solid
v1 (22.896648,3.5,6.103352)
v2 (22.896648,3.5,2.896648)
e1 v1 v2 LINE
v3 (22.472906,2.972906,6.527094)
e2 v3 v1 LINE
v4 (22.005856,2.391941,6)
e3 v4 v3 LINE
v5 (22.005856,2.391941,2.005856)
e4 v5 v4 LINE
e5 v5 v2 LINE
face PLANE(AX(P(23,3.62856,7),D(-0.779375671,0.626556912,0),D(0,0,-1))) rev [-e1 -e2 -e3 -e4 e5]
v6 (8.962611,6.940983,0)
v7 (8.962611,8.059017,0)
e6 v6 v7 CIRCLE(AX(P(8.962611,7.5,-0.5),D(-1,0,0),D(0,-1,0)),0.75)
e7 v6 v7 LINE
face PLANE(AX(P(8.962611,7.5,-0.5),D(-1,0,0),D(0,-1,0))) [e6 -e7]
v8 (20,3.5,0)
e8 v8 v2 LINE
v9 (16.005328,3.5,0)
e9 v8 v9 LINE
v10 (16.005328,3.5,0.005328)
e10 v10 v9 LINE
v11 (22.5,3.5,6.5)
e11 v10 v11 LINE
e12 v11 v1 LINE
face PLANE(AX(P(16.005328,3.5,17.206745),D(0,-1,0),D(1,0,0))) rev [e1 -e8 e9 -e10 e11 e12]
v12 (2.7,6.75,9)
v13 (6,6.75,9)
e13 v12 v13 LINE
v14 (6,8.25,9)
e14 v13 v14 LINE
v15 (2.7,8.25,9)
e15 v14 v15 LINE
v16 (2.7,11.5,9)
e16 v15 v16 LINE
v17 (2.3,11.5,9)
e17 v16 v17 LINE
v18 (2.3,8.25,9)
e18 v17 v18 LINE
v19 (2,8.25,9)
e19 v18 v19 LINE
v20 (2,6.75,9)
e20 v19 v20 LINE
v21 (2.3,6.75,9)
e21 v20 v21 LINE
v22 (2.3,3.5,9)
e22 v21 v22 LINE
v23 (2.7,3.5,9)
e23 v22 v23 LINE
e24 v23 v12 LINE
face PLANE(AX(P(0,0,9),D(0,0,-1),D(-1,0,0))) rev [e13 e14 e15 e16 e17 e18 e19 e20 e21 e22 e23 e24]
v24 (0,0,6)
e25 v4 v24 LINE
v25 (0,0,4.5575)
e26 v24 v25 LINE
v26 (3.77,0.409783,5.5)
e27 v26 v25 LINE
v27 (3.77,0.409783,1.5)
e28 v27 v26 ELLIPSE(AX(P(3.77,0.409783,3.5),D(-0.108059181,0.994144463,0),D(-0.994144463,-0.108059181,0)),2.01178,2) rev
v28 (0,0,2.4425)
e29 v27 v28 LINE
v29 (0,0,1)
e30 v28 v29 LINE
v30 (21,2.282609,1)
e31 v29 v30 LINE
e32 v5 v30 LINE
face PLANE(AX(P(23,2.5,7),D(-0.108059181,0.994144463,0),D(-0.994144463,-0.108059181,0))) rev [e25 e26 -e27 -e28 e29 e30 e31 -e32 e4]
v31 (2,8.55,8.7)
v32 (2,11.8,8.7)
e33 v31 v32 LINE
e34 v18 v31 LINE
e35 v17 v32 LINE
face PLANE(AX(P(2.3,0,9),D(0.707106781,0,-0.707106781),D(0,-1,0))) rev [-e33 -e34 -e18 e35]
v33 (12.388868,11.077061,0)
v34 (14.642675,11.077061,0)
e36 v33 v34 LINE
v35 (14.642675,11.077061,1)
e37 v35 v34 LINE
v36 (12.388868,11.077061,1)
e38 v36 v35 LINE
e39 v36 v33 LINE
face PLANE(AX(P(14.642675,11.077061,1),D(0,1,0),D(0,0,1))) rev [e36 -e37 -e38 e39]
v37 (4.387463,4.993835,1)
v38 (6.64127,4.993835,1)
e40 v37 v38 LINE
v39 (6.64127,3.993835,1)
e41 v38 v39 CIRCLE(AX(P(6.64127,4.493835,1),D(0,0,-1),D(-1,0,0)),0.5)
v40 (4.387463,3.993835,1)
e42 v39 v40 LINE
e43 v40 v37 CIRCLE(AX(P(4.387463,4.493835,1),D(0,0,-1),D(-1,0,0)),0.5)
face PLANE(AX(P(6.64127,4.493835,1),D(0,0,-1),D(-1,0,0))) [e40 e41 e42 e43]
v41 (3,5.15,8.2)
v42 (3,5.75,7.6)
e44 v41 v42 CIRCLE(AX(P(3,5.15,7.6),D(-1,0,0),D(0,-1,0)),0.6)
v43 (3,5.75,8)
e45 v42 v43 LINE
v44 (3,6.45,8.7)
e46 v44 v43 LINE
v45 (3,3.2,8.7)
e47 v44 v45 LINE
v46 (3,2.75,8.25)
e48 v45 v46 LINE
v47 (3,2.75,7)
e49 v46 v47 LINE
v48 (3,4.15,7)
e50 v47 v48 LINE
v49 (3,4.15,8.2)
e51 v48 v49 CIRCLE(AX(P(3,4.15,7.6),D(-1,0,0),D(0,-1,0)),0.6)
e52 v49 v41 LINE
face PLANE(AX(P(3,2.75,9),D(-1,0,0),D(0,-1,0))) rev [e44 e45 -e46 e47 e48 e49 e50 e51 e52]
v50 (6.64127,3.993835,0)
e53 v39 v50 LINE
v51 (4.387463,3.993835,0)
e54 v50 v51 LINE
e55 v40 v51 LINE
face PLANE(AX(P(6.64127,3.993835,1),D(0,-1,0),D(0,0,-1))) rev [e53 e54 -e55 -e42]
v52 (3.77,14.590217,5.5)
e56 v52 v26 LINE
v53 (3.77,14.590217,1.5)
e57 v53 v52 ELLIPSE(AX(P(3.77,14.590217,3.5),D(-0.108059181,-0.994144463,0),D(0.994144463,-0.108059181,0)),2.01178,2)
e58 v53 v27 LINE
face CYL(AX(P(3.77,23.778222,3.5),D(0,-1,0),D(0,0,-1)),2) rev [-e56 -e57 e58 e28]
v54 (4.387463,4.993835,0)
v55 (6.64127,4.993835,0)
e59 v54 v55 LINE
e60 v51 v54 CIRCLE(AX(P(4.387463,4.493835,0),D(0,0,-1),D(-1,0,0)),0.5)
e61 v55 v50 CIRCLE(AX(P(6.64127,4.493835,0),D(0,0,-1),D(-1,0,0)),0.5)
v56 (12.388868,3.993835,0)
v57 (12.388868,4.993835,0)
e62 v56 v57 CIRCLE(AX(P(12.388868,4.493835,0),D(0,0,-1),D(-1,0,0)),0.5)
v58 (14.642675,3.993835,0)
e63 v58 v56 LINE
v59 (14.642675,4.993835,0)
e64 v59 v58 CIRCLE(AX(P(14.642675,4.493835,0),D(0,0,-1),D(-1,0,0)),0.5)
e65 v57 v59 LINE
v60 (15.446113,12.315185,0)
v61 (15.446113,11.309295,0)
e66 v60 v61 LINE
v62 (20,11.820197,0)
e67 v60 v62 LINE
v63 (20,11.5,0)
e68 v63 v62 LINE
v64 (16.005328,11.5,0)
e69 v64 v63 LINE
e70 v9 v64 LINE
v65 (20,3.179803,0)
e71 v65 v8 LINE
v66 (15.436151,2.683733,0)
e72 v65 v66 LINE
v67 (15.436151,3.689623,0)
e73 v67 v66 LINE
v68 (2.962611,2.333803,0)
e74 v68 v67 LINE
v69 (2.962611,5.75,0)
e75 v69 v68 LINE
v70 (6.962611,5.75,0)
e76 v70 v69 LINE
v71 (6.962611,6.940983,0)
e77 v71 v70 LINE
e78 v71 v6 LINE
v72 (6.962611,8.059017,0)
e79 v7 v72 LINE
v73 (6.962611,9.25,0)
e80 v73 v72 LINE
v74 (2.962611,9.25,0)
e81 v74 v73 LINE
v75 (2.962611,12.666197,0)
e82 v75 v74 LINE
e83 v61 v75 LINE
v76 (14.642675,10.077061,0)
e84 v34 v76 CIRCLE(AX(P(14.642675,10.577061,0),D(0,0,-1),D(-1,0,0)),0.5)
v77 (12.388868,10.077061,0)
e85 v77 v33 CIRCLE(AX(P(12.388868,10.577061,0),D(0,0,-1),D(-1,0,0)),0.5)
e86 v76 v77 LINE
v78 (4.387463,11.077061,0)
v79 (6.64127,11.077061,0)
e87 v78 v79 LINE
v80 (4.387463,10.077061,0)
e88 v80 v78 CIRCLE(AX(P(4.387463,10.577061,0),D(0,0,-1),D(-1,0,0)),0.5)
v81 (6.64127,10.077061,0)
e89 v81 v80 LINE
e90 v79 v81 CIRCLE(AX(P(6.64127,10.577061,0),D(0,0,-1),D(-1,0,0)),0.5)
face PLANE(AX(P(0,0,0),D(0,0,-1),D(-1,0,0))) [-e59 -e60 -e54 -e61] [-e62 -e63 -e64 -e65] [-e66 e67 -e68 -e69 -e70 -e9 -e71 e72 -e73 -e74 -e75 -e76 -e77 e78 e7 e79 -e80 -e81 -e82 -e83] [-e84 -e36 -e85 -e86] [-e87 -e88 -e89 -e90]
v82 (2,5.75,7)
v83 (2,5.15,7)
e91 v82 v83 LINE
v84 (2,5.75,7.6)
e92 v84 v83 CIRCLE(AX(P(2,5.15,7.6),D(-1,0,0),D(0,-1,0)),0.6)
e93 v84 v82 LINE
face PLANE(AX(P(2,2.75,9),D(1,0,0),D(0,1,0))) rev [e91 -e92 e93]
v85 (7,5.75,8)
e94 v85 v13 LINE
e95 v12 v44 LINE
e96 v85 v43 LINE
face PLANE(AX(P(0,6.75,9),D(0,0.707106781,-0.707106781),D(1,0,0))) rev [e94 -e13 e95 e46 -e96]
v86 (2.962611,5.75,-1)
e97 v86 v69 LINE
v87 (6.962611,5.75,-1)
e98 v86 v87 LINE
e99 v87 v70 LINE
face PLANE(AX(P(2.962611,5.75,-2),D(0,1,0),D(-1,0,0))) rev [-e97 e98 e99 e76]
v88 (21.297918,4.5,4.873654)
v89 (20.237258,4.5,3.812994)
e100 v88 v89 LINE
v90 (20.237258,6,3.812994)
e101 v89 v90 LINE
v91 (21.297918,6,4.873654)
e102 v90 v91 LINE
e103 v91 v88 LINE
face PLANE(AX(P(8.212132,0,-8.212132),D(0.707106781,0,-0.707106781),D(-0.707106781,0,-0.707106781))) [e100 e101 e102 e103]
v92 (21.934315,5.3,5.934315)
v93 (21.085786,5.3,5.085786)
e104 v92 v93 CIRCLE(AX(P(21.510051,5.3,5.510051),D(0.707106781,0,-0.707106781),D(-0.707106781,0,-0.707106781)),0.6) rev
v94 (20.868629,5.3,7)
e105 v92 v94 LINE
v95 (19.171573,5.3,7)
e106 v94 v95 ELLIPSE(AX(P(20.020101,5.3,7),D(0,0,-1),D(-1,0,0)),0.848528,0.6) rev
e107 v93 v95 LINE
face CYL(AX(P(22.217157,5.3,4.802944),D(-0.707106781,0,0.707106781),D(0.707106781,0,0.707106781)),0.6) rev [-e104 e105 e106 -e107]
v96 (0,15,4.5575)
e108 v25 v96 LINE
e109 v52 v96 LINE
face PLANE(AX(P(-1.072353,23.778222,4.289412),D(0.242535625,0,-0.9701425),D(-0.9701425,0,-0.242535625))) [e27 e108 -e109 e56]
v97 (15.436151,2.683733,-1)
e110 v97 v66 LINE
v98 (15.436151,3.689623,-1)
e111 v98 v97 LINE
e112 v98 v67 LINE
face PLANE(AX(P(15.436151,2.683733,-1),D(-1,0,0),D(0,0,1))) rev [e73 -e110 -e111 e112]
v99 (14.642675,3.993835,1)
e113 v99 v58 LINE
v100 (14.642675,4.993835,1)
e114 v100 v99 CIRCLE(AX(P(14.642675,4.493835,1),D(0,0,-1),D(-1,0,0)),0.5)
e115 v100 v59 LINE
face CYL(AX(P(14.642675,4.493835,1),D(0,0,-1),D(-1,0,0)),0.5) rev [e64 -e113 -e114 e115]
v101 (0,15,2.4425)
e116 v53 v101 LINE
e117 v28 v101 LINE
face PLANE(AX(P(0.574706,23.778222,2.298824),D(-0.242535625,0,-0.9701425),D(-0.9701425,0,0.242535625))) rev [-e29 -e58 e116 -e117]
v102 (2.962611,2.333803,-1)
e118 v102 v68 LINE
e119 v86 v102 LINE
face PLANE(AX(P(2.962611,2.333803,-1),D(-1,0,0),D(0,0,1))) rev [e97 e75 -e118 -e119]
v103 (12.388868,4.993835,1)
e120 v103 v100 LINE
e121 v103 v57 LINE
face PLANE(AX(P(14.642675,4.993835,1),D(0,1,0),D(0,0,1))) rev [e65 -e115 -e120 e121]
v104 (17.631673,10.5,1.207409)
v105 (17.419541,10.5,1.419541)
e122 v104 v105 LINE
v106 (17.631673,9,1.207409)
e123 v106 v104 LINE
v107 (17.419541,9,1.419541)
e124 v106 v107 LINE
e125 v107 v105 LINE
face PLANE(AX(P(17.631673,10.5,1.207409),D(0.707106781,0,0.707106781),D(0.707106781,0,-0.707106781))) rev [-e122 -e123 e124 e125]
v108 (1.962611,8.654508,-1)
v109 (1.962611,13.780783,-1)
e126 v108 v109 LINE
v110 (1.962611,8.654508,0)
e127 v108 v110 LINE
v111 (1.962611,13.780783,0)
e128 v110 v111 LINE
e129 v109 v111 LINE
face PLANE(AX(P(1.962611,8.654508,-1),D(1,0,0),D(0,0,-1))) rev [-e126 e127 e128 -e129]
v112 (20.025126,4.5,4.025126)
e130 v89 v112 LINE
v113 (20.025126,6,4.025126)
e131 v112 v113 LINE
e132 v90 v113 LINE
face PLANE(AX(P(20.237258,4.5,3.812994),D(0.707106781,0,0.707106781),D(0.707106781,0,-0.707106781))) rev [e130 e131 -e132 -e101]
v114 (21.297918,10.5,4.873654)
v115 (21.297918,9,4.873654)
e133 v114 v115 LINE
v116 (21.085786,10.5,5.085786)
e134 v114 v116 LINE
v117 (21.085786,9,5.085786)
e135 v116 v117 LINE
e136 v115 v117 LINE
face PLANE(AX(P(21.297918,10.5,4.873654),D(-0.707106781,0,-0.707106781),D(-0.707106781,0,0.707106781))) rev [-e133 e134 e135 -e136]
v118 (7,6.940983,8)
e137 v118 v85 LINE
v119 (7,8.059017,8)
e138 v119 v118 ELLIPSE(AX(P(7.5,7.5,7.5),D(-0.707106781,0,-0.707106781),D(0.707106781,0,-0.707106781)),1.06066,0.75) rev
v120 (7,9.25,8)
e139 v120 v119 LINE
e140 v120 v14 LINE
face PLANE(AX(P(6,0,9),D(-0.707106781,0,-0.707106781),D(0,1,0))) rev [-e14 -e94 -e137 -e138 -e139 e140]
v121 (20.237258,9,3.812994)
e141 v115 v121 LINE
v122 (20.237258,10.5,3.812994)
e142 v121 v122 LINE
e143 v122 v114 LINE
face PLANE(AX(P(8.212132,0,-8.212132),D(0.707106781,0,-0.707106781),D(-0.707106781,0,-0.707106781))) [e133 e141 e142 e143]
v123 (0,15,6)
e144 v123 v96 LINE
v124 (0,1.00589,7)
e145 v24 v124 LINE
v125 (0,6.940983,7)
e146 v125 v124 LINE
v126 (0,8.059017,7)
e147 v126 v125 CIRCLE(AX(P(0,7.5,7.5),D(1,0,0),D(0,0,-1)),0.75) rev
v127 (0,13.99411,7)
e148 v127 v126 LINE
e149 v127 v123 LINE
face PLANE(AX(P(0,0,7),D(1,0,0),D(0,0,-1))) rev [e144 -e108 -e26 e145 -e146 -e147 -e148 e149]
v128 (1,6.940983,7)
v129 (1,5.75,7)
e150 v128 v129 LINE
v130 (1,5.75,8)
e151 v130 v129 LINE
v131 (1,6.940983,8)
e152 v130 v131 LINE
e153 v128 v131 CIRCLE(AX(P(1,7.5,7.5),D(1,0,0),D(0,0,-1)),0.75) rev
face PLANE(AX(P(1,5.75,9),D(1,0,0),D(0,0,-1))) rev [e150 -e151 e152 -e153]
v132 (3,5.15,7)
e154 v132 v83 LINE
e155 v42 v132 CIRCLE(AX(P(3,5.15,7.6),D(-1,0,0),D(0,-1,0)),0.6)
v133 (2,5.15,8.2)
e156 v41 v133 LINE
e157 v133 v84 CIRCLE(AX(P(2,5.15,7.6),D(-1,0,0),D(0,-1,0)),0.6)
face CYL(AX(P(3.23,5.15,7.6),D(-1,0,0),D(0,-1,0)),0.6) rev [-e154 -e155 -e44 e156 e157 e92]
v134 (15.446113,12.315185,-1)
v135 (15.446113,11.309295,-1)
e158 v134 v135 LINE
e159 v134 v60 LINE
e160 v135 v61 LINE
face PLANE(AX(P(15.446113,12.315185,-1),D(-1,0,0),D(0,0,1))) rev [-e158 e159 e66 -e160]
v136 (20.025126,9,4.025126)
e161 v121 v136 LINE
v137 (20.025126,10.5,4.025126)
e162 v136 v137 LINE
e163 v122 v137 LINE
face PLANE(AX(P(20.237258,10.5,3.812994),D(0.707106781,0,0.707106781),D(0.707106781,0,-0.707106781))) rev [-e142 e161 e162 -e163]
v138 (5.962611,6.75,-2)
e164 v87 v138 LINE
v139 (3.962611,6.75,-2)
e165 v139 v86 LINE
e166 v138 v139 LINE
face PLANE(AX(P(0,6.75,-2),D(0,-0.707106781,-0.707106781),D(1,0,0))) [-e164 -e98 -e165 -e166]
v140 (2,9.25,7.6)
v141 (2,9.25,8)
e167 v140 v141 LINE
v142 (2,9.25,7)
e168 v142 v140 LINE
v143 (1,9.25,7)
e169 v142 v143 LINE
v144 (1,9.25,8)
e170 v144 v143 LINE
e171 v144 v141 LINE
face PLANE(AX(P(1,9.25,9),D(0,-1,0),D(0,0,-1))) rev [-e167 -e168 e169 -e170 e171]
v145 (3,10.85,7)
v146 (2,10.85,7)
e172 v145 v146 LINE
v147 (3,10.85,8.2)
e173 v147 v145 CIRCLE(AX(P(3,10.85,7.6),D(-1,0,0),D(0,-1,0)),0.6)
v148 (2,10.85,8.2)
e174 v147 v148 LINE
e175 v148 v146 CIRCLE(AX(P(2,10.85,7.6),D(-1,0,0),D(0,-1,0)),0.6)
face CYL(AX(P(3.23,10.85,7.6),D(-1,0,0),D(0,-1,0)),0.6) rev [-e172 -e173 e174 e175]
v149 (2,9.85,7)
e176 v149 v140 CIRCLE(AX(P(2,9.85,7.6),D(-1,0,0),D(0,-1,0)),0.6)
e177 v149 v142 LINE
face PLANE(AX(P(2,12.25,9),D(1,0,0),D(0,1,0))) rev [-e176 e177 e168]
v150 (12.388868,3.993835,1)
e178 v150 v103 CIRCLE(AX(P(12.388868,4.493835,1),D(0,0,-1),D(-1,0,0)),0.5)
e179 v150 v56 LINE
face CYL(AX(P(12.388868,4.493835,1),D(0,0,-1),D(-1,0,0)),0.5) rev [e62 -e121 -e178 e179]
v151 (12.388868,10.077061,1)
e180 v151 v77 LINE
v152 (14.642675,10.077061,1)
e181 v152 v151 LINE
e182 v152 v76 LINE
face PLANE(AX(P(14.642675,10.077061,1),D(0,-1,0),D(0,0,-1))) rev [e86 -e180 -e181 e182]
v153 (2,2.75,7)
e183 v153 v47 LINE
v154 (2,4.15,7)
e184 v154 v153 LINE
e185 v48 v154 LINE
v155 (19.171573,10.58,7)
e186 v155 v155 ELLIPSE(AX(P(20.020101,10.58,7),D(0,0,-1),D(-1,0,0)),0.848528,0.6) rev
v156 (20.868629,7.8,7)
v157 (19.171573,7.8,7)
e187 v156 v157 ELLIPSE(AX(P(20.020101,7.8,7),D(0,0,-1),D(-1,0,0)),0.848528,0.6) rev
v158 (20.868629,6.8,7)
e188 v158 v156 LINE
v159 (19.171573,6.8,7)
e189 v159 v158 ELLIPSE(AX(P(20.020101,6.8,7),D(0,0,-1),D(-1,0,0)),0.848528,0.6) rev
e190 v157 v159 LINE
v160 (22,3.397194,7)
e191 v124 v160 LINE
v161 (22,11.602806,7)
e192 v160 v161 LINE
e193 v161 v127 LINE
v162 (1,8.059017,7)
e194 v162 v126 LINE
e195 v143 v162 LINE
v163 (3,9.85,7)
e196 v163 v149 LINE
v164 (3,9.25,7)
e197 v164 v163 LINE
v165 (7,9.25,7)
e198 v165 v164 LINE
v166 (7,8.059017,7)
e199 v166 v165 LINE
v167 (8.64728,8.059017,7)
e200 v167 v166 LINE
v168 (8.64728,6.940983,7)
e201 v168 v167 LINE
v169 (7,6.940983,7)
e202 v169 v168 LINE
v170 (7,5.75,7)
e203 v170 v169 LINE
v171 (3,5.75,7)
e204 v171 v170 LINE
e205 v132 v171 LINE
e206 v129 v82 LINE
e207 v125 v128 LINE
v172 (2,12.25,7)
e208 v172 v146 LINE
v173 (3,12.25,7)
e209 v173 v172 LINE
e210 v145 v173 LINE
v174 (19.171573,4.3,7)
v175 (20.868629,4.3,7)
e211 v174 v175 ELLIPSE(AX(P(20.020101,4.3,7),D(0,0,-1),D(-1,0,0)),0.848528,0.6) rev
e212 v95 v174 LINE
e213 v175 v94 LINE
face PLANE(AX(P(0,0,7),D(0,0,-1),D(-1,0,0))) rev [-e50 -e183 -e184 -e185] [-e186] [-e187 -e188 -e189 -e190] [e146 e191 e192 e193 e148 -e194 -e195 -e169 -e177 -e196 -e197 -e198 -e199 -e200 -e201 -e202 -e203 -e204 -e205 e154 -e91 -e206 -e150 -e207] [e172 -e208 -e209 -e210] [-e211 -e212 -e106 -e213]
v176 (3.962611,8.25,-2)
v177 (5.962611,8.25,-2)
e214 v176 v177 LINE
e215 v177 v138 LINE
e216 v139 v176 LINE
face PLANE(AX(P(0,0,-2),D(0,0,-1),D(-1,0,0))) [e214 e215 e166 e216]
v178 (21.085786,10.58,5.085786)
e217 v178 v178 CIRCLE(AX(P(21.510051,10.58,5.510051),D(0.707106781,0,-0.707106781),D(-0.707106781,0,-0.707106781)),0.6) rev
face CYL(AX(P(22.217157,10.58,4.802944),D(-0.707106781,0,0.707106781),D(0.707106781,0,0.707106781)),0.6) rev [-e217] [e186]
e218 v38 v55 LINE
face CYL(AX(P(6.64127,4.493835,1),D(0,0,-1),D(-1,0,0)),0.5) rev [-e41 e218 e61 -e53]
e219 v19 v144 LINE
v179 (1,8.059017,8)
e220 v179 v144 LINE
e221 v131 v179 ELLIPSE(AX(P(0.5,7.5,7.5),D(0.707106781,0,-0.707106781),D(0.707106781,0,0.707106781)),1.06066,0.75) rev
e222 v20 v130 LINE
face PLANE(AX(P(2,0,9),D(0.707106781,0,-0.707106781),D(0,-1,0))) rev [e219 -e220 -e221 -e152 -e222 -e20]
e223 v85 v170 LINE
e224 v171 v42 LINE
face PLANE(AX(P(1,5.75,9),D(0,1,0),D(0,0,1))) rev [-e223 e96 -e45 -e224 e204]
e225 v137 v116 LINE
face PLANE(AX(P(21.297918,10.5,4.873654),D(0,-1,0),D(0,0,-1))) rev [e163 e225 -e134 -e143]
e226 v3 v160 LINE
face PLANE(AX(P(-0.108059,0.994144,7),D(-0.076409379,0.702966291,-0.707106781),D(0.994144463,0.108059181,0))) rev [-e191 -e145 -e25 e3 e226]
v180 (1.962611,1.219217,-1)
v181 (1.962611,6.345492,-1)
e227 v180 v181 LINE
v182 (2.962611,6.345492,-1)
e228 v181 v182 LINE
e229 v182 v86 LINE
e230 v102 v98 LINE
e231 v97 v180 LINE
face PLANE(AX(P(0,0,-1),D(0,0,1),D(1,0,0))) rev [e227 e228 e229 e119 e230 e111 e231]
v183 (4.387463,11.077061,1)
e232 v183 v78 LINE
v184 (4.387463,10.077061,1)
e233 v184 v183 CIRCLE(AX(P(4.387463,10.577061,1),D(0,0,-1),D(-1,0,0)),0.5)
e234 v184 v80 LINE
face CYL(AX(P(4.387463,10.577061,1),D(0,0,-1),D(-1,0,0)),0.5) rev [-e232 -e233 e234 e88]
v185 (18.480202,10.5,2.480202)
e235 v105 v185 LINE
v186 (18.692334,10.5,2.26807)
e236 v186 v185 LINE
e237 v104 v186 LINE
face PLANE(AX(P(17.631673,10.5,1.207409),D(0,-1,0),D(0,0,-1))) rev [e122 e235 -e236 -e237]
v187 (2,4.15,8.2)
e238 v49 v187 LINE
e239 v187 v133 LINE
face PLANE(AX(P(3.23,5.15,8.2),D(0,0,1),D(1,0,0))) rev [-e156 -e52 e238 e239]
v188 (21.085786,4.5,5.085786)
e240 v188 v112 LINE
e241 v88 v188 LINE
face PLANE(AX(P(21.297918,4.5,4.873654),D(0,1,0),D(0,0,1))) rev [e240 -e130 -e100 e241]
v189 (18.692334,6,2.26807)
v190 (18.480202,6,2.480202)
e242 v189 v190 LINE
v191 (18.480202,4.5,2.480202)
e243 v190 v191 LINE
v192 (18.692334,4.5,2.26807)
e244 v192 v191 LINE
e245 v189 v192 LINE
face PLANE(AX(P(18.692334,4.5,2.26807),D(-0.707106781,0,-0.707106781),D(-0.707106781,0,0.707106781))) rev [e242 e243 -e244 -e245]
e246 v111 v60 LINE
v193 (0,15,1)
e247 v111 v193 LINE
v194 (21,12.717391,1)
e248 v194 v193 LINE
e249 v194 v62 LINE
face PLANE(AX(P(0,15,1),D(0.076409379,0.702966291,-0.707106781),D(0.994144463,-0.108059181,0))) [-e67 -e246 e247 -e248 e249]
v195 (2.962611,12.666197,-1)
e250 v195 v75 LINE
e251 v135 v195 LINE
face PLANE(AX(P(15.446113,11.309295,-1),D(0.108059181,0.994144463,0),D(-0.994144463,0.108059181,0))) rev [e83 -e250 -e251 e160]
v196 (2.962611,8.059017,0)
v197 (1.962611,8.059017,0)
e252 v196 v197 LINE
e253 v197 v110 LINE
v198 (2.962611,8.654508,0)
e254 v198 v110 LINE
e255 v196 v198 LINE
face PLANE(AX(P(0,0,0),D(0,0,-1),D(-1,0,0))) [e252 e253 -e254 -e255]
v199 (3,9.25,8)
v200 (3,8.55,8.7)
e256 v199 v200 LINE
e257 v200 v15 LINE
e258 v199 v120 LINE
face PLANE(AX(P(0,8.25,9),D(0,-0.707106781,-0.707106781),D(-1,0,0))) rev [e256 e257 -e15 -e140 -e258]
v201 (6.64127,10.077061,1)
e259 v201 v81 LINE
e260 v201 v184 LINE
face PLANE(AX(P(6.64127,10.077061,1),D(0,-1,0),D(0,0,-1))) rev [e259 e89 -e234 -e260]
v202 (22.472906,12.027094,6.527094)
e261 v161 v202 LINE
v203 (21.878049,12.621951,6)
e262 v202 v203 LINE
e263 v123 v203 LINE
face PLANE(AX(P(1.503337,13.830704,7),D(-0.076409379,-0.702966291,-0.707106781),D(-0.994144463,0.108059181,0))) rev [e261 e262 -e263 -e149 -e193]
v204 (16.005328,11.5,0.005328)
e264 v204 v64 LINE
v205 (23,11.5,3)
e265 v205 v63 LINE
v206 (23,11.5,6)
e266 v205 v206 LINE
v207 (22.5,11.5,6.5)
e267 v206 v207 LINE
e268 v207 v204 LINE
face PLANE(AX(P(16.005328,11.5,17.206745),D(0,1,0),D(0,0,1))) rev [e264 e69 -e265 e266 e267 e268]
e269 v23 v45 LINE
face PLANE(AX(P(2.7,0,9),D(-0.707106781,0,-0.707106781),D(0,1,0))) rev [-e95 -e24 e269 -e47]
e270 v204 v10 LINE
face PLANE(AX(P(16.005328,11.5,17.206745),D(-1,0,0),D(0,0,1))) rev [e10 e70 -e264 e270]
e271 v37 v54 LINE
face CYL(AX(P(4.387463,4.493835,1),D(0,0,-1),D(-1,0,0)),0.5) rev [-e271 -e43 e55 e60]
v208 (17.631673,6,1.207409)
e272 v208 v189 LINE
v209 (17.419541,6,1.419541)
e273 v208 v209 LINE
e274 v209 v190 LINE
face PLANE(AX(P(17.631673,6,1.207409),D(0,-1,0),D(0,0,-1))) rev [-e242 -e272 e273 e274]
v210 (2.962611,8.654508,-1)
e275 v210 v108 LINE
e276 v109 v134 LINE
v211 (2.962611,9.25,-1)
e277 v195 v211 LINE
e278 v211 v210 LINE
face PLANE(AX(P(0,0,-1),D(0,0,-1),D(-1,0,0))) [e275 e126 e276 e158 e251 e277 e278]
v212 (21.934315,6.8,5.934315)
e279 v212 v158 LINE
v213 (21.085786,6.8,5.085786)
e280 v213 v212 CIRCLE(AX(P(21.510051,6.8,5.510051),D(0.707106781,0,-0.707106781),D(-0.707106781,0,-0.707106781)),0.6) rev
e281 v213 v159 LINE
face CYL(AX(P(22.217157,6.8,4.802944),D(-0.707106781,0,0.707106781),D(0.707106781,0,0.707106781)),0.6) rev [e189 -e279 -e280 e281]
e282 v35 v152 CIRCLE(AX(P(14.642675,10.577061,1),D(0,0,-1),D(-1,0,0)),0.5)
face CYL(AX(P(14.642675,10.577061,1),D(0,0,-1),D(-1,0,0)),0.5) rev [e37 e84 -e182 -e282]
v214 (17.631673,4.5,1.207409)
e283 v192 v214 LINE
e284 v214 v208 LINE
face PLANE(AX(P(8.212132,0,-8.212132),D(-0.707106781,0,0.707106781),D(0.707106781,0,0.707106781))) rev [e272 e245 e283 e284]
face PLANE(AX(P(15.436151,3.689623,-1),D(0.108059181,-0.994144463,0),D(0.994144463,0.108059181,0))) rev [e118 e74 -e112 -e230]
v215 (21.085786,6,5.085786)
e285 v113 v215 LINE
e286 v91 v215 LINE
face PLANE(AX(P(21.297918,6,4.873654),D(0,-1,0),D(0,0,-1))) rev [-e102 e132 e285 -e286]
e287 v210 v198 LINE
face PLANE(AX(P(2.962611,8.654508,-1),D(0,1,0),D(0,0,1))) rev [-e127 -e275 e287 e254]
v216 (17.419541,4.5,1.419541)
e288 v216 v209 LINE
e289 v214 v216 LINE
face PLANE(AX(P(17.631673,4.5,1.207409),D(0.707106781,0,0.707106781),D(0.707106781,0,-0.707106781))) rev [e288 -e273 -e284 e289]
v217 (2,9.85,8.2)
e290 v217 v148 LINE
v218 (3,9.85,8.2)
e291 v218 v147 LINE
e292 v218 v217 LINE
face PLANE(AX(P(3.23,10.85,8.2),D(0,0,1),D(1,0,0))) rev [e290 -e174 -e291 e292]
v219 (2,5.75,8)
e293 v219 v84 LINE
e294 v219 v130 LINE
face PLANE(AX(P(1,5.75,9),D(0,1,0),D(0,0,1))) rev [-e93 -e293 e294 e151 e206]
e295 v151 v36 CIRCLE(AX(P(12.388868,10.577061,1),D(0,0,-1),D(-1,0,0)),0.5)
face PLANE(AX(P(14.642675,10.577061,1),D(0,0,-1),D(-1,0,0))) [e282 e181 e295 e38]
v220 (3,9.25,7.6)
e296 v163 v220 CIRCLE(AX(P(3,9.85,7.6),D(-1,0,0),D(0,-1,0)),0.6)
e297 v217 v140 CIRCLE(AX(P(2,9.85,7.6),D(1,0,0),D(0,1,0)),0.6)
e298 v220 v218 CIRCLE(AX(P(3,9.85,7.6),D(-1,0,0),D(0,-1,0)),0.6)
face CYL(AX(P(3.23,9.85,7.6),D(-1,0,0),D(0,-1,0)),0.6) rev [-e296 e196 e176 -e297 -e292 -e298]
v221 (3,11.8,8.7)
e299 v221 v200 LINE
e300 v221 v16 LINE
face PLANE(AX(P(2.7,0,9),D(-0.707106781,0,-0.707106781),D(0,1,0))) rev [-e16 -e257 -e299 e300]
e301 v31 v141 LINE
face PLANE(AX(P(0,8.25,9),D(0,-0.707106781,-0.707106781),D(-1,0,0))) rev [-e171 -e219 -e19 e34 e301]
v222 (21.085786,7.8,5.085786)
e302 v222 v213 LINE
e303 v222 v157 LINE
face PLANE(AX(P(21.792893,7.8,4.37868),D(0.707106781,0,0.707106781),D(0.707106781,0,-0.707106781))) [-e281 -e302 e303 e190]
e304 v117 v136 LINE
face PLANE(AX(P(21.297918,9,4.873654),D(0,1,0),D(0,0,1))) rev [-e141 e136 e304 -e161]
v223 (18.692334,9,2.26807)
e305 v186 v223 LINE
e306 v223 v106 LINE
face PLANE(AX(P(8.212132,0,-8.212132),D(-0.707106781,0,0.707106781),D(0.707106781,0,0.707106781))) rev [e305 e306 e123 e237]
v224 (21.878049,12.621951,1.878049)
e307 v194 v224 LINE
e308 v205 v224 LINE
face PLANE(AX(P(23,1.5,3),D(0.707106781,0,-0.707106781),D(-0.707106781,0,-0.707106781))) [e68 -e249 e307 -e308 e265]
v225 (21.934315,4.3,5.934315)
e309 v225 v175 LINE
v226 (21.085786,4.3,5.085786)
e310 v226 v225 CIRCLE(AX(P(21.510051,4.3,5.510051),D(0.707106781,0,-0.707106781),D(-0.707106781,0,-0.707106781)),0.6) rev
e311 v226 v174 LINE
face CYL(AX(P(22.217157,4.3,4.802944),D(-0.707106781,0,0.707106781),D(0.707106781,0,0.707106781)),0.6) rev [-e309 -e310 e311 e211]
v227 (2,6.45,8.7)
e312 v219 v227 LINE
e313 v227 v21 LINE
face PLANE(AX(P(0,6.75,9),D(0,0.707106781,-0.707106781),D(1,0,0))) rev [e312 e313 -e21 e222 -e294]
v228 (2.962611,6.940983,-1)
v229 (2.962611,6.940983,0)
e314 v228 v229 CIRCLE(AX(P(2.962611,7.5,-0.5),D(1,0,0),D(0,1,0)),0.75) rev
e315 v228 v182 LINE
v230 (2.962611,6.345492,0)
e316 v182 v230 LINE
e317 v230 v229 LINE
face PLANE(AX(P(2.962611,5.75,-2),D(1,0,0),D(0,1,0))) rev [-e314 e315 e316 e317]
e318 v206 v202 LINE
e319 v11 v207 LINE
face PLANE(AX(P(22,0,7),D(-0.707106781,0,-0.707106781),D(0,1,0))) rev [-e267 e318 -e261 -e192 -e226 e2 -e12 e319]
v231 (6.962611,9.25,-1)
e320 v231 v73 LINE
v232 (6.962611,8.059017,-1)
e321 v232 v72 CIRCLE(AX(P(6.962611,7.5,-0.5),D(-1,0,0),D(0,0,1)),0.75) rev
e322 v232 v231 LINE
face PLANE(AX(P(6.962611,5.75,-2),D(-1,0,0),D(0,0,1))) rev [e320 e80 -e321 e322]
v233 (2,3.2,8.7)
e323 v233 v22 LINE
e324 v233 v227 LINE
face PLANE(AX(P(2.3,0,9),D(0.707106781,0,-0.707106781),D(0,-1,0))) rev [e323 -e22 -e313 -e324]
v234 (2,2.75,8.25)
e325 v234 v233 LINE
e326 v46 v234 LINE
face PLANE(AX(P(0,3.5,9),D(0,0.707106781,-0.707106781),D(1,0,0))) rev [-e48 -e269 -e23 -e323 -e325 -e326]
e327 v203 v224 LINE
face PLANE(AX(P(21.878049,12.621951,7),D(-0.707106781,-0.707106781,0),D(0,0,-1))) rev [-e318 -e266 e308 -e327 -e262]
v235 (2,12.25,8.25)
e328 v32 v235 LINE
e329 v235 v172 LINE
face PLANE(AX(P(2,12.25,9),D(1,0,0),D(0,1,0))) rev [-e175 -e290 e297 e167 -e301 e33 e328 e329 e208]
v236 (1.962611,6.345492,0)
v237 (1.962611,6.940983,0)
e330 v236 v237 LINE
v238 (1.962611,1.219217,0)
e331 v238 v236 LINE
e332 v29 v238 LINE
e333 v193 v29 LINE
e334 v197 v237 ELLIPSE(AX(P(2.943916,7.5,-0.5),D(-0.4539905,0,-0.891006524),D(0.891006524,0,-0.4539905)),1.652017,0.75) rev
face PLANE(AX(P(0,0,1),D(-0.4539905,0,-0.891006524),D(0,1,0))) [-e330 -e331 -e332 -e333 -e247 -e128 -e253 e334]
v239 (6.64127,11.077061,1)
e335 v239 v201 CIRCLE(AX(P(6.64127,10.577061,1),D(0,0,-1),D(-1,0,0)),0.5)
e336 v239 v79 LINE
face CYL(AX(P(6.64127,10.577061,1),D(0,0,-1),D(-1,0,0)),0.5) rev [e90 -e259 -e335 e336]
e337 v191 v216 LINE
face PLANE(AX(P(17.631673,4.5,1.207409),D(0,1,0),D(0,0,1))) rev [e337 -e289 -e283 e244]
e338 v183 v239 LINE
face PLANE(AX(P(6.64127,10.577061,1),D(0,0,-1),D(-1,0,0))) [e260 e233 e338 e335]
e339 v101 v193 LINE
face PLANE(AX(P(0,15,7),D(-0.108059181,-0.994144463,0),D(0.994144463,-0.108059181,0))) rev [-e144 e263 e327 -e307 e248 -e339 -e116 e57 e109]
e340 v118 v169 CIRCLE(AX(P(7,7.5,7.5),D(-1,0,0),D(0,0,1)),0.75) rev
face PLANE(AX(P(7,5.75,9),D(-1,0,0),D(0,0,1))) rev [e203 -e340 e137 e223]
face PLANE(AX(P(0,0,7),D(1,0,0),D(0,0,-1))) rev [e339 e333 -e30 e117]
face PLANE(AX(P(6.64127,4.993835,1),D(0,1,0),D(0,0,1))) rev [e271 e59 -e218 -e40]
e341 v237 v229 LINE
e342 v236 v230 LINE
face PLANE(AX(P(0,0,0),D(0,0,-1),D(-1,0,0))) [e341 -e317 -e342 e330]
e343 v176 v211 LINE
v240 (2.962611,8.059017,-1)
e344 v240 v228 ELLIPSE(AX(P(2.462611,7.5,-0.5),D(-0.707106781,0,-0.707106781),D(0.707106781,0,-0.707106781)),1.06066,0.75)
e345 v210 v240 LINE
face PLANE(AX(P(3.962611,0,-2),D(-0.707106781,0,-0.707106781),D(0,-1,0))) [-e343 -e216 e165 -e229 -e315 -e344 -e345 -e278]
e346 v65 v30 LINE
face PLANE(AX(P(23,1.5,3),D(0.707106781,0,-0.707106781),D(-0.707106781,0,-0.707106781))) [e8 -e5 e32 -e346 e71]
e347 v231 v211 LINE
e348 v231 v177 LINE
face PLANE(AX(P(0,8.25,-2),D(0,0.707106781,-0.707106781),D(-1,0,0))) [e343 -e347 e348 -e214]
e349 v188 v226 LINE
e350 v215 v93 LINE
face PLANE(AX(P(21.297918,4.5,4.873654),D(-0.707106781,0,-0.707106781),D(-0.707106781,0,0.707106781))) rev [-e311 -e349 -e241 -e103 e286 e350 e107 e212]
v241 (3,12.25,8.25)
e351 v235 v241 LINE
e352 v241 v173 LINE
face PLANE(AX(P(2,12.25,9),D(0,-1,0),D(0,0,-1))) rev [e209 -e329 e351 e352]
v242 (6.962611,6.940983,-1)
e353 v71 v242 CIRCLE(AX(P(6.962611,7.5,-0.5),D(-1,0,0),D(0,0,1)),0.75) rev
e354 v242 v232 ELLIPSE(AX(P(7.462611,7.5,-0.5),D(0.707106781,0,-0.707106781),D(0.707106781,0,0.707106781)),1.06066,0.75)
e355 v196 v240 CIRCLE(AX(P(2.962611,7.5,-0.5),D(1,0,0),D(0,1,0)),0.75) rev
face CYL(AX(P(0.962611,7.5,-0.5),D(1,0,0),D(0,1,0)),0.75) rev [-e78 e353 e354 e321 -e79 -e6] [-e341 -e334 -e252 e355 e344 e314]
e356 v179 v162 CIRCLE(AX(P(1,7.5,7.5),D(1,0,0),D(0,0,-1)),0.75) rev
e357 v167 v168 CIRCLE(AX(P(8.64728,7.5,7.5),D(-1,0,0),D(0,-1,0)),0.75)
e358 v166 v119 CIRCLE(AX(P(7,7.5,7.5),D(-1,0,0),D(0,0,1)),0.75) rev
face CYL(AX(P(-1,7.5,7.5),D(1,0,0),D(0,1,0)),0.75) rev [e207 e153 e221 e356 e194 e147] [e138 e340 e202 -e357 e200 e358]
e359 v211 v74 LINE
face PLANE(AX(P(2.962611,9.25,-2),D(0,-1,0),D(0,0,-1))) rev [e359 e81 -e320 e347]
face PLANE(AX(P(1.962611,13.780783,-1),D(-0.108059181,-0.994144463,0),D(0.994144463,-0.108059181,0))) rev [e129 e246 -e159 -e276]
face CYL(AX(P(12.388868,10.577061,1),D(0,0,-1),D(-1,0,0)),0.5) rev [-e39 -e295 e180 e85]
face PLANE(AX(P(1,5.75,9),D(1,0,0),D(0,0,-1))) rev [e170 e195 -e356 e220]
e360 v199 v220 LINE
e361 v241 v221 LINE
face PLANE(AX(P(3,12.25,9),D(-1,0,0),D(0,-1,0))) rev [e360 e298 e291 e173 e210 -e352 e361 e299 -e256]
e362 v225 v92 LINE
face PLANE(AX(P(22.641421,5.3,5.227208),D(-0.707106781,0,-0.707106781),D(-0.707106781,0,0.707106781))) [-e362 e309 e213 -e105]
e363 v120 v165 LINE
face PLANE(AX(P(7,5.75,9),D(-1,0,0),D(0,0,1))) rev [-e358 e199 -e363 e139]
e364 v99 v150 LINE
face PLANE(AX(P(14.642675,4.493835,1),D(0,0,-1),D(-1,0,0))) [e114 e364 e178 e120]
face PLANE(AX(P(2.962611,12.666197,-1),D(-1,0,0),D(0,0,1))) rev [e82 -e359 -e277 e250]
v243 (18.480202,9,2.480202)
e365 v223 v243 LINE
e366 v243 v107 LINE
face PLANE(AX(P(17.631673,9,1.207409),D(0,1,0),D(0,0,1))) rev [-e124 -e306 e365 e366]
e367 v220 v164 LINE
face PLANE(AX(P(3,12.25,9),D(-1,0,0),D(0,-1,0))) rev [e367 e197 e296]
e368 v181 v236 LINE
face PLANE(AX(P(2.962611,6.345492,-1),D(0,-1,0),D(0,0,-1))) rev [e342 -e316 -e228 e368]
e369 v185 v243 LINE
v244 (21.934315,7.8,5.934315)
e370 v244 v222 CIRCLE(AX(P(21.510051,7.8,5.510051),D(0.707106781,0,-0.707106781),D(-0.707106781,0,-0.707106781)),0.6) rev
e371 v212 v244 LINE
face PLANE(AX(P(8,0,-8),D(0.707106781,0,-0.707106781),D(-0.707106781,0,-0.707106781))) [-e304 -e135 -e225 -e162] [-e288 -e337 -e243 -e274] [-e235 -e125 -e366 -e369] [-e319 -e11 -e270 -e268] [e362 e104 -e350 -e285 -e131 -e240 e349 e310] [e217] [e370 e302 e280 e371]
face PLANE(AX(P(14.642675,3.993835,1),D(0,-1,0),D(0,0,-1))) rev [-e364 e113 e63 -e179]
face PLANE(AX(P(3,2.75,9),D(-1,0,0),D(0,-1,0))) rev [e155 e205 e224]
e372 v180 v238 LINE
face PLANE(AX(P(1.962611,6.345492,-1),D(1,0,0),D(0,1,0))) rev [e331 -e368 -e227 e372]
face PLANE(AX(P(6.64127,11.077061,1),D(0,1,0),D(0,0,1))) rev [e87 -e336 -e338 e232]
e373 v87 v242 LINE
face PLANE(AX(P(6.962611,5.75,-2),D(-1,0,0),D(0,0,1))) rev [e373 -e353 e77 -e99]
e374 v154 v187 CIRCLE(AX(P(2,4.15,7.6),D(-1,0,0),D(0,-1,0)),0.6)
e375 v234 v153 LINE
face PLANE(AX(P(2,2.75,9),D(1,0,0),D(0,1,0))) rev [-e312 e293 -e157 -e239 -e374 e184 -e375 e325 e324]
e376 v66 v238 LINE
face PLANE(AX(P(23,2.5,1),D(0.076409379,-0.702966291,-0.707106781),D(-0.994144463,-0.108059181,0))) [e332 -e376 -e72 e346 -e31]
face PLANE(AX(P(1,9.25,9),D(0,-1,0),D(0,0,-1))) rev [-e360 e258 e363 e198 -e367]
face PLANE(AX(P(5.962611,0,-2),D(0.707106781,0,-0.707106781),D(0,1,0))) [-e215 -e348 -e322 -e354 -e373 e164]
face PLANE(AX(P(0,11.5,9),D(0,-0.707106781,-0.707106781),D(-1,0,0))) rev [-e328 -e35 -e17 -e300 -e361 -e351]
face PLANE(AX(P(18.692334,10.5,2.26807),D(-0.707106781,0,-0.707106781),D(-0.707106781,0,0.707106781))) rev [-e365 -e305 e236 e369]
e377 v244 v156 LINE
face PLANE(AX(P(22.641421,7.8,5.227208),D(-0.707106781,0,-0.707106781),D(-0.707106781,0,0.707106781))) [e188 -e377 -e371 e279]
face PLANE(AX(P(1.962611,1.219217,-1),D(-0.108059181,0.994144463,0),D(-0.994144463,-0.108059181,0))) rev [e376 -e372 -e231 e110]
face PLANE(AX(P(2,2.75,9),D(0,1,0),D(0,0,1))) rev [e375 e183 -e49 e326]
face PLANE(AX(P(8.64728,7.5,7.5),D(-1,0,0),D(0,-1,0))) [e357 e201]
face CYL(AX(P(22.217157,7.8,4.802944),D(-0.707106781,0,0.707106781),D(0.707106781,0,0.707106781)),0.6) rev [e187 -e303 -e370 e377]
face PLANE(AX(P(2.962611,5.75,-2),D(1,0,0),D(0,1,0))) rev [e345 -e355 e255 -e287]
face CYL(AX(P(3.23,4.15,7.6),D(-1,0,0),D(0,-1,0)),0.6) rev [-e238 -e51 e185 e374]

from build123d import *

# Parameters (mm, degrees)
BOSS_EXTRUDE1_DEPTH      = 7
CHAMFER1_SIZE            = 1
CHAMFER7_SIZE            = 1
CHAMFER7_EDGE_2_SIZE     = 1
CHAMFER7_EDGE_2_SIZE2    = 1.128559542
CHAMFER7_EDGE_3_SIZE     = 1
CHAMFER7_EDGE_4_SIZE     = 1
CHAMFER7_EDGE_4_SIZE2    = 1.128559542
CHAMFER14_SIZE           = 1
CHAMFER14_SIZE2          = 1.962610506
SKETCH13_W               = 6
SKETCH13_H               = 3.5
BOSS_EXTRUDE4_DEPTH      = 2
CUT_EXTRUDE9_DEPTH       = 2
CUT_EXTRUDE9_DEPTH_BACK  = 7.647280269
SKETCH14_R               = 0.75
CHAMFER15_SIZE           = 1
SKETCH15_W               = 4
SKETCH15_H               = 3.5
BOSS_EXTRUDE6_DEPTH      = 2
CUT_EXTRUDE10_DEPTH      = 2
CUT_EXTRUDE10_DEPTH_BACK = 6
SKETCH18_R               = 0.75
CHAMFER16_SIZE           = 1
CUT_EXTRUDE12_START      = 3.5
CUT_EXTRUDE12_DEPTH      = 8
SKETCH23_W               = 1.5
SKETCH23_H               = 1.5
BOSS_EXTRUDE7_DEPTH      = 0.3
SKETCH30_W               = 1
SKETCH30_H               = 4
BOSS_EXTRUDE12_DEPTH     = 2
CHAMFER19_SIZE           = 0.3
CHAMFER20_SIZE           = 0.75
CUT_EXTRUDE31_DEPTH      = 1
CUT_EXTRUDE31_DEPTH_BACK = 3
SKETCH33_R               = 0.6
CUT_EXTRUDE32_DEPTH      = 1.23
CUT_EXTRUDE33_REACH      = 30.896
CUT_EXTRUDE34_DEPTH      = 10
CUT_EXTRUDE34_DEPTH_BACK = 2
BOSS_EXTRUDE13_DEPTH     = 1
CUT_EXTRUDE35_DEPTH      = 1


# Read off the part's stored shape, not the designer's step: Cut-Extrude12
with BuildPart() as part:
    # Sketch2 → Boss-Extrude1 (new body)
    with BuildSketch(Plane.XY):
        Polygon((0, 0), (0, 15), (23, 12.5), (23, 2.5), align=None)
    extrude(amount=BOSS_EXTRUDE1_DEPTH)

    # Chamfer1
    chamfer1_edges = [part.edges().sort_by_distance(p)[0] for p in [
        (11.5, 13.75, 7),
        (11.5, 1.25, 7),
        (11.5, 13.75, 0),
        (11.5, 1.25, 0),
    ]]
    chamfer(chamfer1_edges, length=CHAMFER1_SIZE)

    # Chamfer7
    chamfer7_edges = [part.edges().sort_by_distance(p)[0] for p in [
        (23, 7.5, 7),
    ]]
    chamfer(chamfer7_edges, length=CHAMFER7_SIZE)

    # Chamfer7 edge 2
    chamfer7_edge_2_edges = [part.edges().sort_by_distance(p)[0] for p in [
        (23, 2.5, 3.5),
    ]]
    chamfer7_edge_2_side = [part.faces().sort_by_distance(p)[0] for p in [
        (11.5, 1.25, 3.5),
    ]]
    chamfer(chamfer7_edge_2_edges, length=CHAMFER7_EDGE_2_SIZE, length2=CHAMFER7_EDGE_2_SIZE2, reference=chamfer7_edge_2_side[0])

    # Chamfer7 edge 3
    chamfer7_edge_3_edges = [part.edges().sort_by_distance(p)[0] for p in [
        (23, 7.5, 0),
    ]]
    chamfer(chamfer7_edge_3_edges, length=CHAMFER7_EDGE_3_SIZE)

    # Chamfer7 edge 4
    chamfer7_edge_4_edges = [part.edges().sort_by_distance(p)[0] for p in [
        (23, 12.5, 3.5),
    ]]
    chamfer7_edge_4_side = [part.faces().sort_by_distance(p)[0] for p in [
        (23, 7.5, 3.5),
    ]]
    chamfer(chamfer7_edge_4_edges, length=CHAMFER7_EDGE_4_SIZE, length2=CHAMFER7_EDGE_4_SIZE2, reference=chamfer7_edge_4_side[0])

    # Chamfer14
    chamfer14_edges = [part.edges().sort_by_distance(p)[0] for p in [
        (0, 7.5, 0),
    ]]
    chamfer14_side = [part.faces().sort_by_distance(p)[0] for p in [
        (0, 7.5, 3.5),
    ]]
    chamfer(chamfer14_edges, length=CHAMFER14_SIZE, length2=CHAMFER14_SIZE2, reference=chamfer14_side[0])

    # Sketch13 → Boss-Extrude4 (add)
    with BuildSketch(Plane.XY.offset(7)):
        with Locations((4, 7.5)):
            Rectangle(SKETCH13_W, SKETCH13_H)
    extrude(amount=BOSS_EXTRUDE4_DEPTH)

    # Sketch14 → Cut-Extrude9 (cut, two sides: drawn at the far end of the back side and taken through both)
    with BuildSketch(Plane.ZY.offset(-1).offset(-CUT_EXTRUDE9_DEPTH_BACK)):
        with Locations(Location((7.5, 7.5, 0), (0, 0, 131.810314896))):
            Circle(SKETCH14_R)
    extrude(amount=CUT_EXTRUDE9_DEPTH + CUT_EXTRUDE9_DEPTH_BACK, mode=Mode.SUBTRACT)

    # Chamfer15
    # the kernel refuses this chamfer: 1 mm, written as the material it takes off along each edge
    with BuildSketch(Plane(origin=(7, 3.178317012, 9), x_dir=(0.027495876610586487, 0, -0.9996219169112968), z_dir=(0, 1, 0)), Plane(origin=(1, 11.821682988, 9), x_dir=(-0.02749587661058638, 0, -0.9996219169112968), z_dir=(0, -1, 0))) as chamfer15_piece_1:
        Polygon((CHAMFER15_SIZE * 0.999621916911, CHAMFER15_SIZE * 0.0274958766106), (-CHAMFER15_SIZE * 0.0274958766106, CHAMFER15_SIZE * 0.999621916911), (0, 0), align=None)
    extrude(amount=8.643365976, mode=Mode.SUBTRACT)
    with BuildSketch(Plane(origin=(9.571682988, 9.25, 9), x_dir=(0, 0.027495876610585623, -0.9996219169112968), z_dir=(-1, 0, 0)), Plane(origin=(-1.571682988, 5.75, 9), x_dir=(0, -0.027495876610586487, -0.9996219169112968), z_dir=(1, 0, 0))) as chamfer15_piece_2:
        Polygon((CHAMFER15_SIZE * 0.999621916911, CHAMFER15_SIZE * 0.0274958766106), (-CHAMFER15_SIZE * 0.0274958766106, CHAMFER15_SIZE * 0.999621916911), (0, 0), align=None)
    extrude(amount=11.143365976, mode=Mode.SUBTRACT)

    # Sketch15 → Boss-Extrude6 (add)
    with BuildSketch(Plane(origin=(0, 0, 0), x_dir=(-1, 0, 0), z_dir=(0, 0, -1))):
        with Locations((-4.962610506, 7.5)):
            Rectangle(SKETCH15_W, SKETCH15_H)
    extrude(amount=BOSS_EXTRUDE6_DEPTH)

    # Sketch18 → Cut-Extrude10 (cut, two sides: drawn at the far end of the back side and taken through both)
    with BuildSketch(Plane.ZY.offset(-2.962610506).offset(-CUT_EXTRUDE10_DEPTH_BACK)):
        with Locations(Location((-0.5, 7.5, 0), (0, 0, 48.189685104))):
            Circle(SKETCH18_R)
    extrude(amount=CUT_EXTRUDE10_DEPTH + CUT_EXTRUDE10_DEPTH_BACK, mode=Mode.SUBTRACT)

    # Chamfer16
    # the kernel refuses this chamfer: 1 mm, written as the material it takes off along each edge
    with BuildSketch(Plane(origin=(6.962610506, 3.178317012, -2), x_dir=(0.027495876610586487, 0, 0.9996219169112968), z_dir=(0, 1, 0)), Plane(origin=(2.962610506, 11.821682988, -2), x_dir=(-0.027495876610586487, 0, 0.9996219169112968), z_dir=(0, -1, 0))) as chamfer16_piece_1:
        Polygon((CHAMFER16_SIZE * 0.999621916911, -CHAMFER16_SIZE * 0.0274958766106), (-CHAMFER16_SIZE * 0.0274958766106, -CHAMFER16_SIZE * 0.999621916911), (0, 0), align=None)
    extrude(amount=8.643365976, mode=Mode.SUBTRACT)
    with BuildSketch(Plane(origin=(0.390927518, 5.75, -2), x_dir=(0, -0.027495876610586487, 0.9996219169112968), z_dir=(1, 0, 0)), Plane(origin=(9.534293493, 9.25, -2), x_dir=(0, 0.027495876610585623, 0.9996219169112968), z_dir=(-1, 0, 0))) as chamfer16_piece_2:
        Polygon((CHAMFER16_SIZE * 0.999621916911, -CHAMFER16_SIZE * 0.0274958766106), (-CHAMFER16_SIZE * 0.0274958766106, -CHAMFER16_SIZE * 0.999621916911), (0, 0), align=None)
    extrude(amount=9.143365976, mode=Mode.SUBTRACT)

    # Cut-Extrude12 outline → Cut-Extrude12 (cut)
    with BuildSketch(Plane(origin=(0, 0, 0), x_dir=(1, 0, 0), z_dir=(0, 1, 0)).offset(CUT_EXTRUDE12_START)):
        Polygon((22, 0), (16.005327865, 0), (16.005327865, -0.005327865), (22.5, -6.5), (23, -6), (23, -1), align=None)
    extrude(amount=CUT_EXTRUDE12_DEPTH, mode=Mode.SUBTRACT)

    # Sketch23 → Boss-Extrude7 (add)
    with BuildSketch(Plane(origin=(8, 0, -8), x_dir=(-0.7071067811865476, 0, -0.7071067811865476), z_dir=(0.7071067811865476, 0, -0.7071067811865476))):
        with Locations((-14.071243238, 5.25)):
            Rectangle(SKETCH23_W, SKETCH23_H)
        with Locations((-14.071243238, 9.75)):
            Rectangle(SKETCH23_W, SKETCH23_H)
        with Locations((-17.756096654, 5.25)):
            Rectangle(SKETCH23_W, SKETCH23_H)
        with Locations((-17.756096654, 9.75)):
            Rectangle(SKETCH23_W, SKETCH23_H)
    extrude(amount=BOSS_EXTRUDE7_DEPTH)

    # Sketch30 → Boss-Extrude12 (add)
    with BuildSketch(Plane.XY.offset(7)):
        with Locations((2.5, 10.25)):
            Rectangle(SKETCH30_W, SKETCH30_H)
        with Locations((2.5, 4.75)):
            Rectangle(SKETCH30_W, SKETCH30_H)
    extrude(amount=BOSS_EXTRUDE12_DEPTH)

    # Chamfer19
    # the kernel refuses this chamfer: 0.3 mm, written as the material it takes off along each edge
    with BuildSketch(Plane(origin=(2, 8.25, 9), x_dir=(-0.027495876610586622, 0, -0.9996219169112968), z_dir=(0, 1, 0))) as chamfer19_piece_1_section:
        Polygon((CHAMFER19_SIZE * 0.999621916911, -CHAMFER19_SIZE * 0.0274958766106), (-CHAMFER19_SIZE * 0.0274958766106, -CHAMFER19_SIZE * 0.999621916911), (0, 0), align=None)
    chamfer19_piece_1 = extrude(amount=4.771504896, mode=Mode.PRIVATE)
    chamfer19_piece_1 = split(chamfer19_piece_1, bisect_by=Plane(origin=(2.100641026, 9.324038462, 7.925961538), z_dir=(0, 0.7071067811862649, 0.7071067811868302)), keep=Keep.TOP, mode=Mode.PRIVATE)
    add(chamfer19_piece_1, mode=Mode.SUBTRACT)
    with BuildSketch(Plane(origin=(3, 13.021504896, 9), x_dir=(0.027495876610585904, 0, -0.9996219169112968), z_dir=(0, -1, 0))) as chamfer19_piece_2_section:
        Polygon((CHAMFER19_SIZE * 0.999621916911, -CHAMFER19_SIZE * 0.0274958766106), (-CHAMFER19_SIZE * 0.0274958766106, -CHAMFER19_SIZE * 0.999621916911), (0, 0), align=None)
    chamfer19_piece_2 = extrude(amount=5.543009793, mode=Mode.PRIVATE)
    chamfer19_piece_2 = split(chamfer19_piece_2, bisect_by=Plane(origin=(2.899358974, 9.324038462, 7.925961538), z_dir=(0, 0.7071067811862649, 0.7071067811868302)), keep=Keep.TOP, mode=Mode.PRIVATE)
    add(chamfer19_piece_2, mode=Mode.SUBTRACT)
    with BuildSketch(Plane(origin=(2, 1.978495104, 9), x_dir=(-0.027495876610586622, 0, -0.9996219169112968), z_dir=(0, 1, 0))) as chamfer19_piece_3_section:
        Polygon((CHAMFER19_SIZE * 0.999621916911, -CHAMFER19_SIZE * 0.0274958766106), (-CHAMFER19_SIZE * 0.0274958766106, -CHAMFER19_SIZE * 0.999621916911), (0, 0), align=None)
    chamfer19_piece_3 = extrude(amount=4.771504896, mode=Mode.PRIVATE)
    chamfer19_piece_3 = split(chamfer19_piece_3, bisect_by=Plane(origin=(2.100641026, 5.675961538, 7.925961538), z_dir=(0, -0.7071067811862649, 0.7071067811868302)), keep=Keep.TOP, mode=Mode.PRIVATE)
    add(chamfer19_piece_3, mode=Mode.SUBTRACT)
    with BuildSketch(Plane(origin=(3, 7.521504896, 9), x_dir=(0.027495876610585904, 0, -0.9996219169112968), z_dir=(0, -1, 0))) as chamfer19_piece_4_section:
        Polygon((CHAMFER19_SIZE * 0.999621916911, -CHAMFER19_SIZE * 0.0274958766106), (-CHAMFER19_SIZE * 0.0274958766106, -CHAMFER19_SIZE * 0.999621916911), (0, 0), align=None)
    chamfer19_piece_4 = extrude(amount=5.543009793, mode=Mode.PRIVATE)
    chamfer19_piece_4 = split(chamfer19_piece_4, bisect_by=Plane(origin=(2.899358974, 5.675961538, 7.925961538), z_dir=(0, -0.7071067811862649, 0.7071067811868302)), keep=Keep.TOP, mode=Mode.PRIVATE)
    add(chamfer19_piece_4, mode=Mode.SUBTRACT)

    # Chamfer20
    chamfer20_edges = [part.edges().sort_by_distance(p)[0] for p in [
        (2.5, 2.75, 9),
        (2.5, 12.25, 9),
    ]]
    chamfer(chamfer20_edges, length=CHAMFER20_SIZE)

    # Sketch33 → Cut-Extrude31 (cut, two sides: drawn at the far end of the back side and taken through both)
    with BuildSketch(Plane(origin=(8, 0, -8), x_dir=(-0.7071067811865476, 0, -0.7071067811865476), z_dir=(0.7071067811865476, 0, -0.7071067811865476)).offset(-CUT_EXTRUDE31_DEPTH_BACK)):
        with Locations((-19.106096654, 10.58)):
            Circle(SKETCH33_R)
        with BuildLine():
            Line((-18.506096654, 7.8), (-18.506096654, 6.8))
            ThreePointArc((-18.506096654, 6.8), (-19.106096654, 6.2), (-19.706096654, 6.8))
            Line((-19.706096654, 6.8), (-19.706096654, 7.8))
            ThreePointArc((-19.706096654, 7.8), (-19.106096654, 8.4), (-18.506096654, 7.8))
        make_face()
        with BuildLine():
            Line((-18.506096654, 5.3), (-18.506096654, 4.3))
            ThreePointArc((-18.506096654, 4.3), (-19.106096654, 3.7), (-19.706096654, 4.3))
            Line((-19.706096654, 4.3), (-19.706096654, 5.3))
            ThreePointArc((-19.706096654, 5.3), (-19.106096654, 5.9), (-18.506096654, 5.3))
        make_face()
    extrude(amount=CUT_EXTRUDE31_DEPTH + CUT_EXTRUDE31_DEPTH_BACK, mode=Mode.SUBTRACT)

    # Sketch35 → Cut-Extrude32 (cut)
    with BuildSketch(Plane.ZY.offset(-2)):
        with BuildLine():
            Line((8.2, 10.85), (8.2, 9.85))
            ThreePointArc((8.2, 9.85), (7.6, 9.25), (7, 9.85))
            Line((7, 9.85), (7, 10.85))
            ThreePointArc((7, 10.85), (7.6, 11.45), (8.2, 10.85))
        make_face()
        with BuildLine():
            Line((8.2, 5.15), (8.2, 4.15))
            ThreePointArc((8.2, 4.15), (7.6, 3.55), (7, 4.15))
            Line((7, 4.15), (7, 5.15))
            ThreePointArc((7, 5.15), (7.6, 5.75), (8.2, 5.15))
        make_face()
    extrude(amount=-CUT_EXTRUDE32_DEPTH, mode=Mode.SUBTRACT)

    # Cut-Extrude33: up to this plane
    cut_extrude33_end = Plane(origin=(0, 15, 7), z_dir=(-0.10805918076841893, -0.9941444630694567, 0))
    # Sketch36 → Cut-Extrude33 (cut, up to the surface)
    with BuildSketch(Plane(origin=(0, 0, 0), x_dir=(0, 0, -1), z_dir=(0, 1, 0)), mode=Mode.PRIVATE) as cut_extrude33_sk1:
        with BuildLine():
            Line((-1.735294118, -2.828823529), (-3, 2.23))
            Line((-3, 2.23), (-4, 2.23))
            Line((-4, 2.23), (-5.264705882, -2.828823529))
            ThreePointArc((-5.264705882, -2.828823529), (-3.5, -1.77), (-1.735294118, -2.828823529))
        make_face()
    cut_extrude33_tool1 = split(extrude(cut_extrude33_sk1.sketch, amount=CUT_EXTRUDE33_REACH, mode=Mode.PRIVATE), bisect_by=cut_extrude33_end, keep=Keep.BOTH, mode=Mode.PRIVATE)
    add(cut_extrude33_tool1.solids().sort_by_distance((0.278692, 0, 3.5))[0], mode=Mode.SUBTRACT)
    # Sketch36 → Cut-Extrude33 (cut, up to the surface)
    with BuildSketch(Plane(origin=(0, 0, 0), x_dir=(0, 0, -1), z_dir=(0, 1, 0)), mode=Mode.PRIVATE) as cut_extrude33_sk2:
        with BuildLine():
            Line((-1.5, -3.77), (-1.735294118, -2.828823529))
            ThreePointArc((-1.735294118, -2.828823529), (-3.5, -1.77), (-5.264705882, -2.828823529))
            Line((-5.264705882, -2.828823529), (-5.5, -3.77))
            ThreePointArc((-5.5, -3.77), (-3.5, -5.77), (-1.5, -3.77))
        make_face()
    cut_extrude33_tool2 = split(extrude(cut_extrude33_sk2.sketch, amount=CUT_EXTRUDE33_REACH, mode=Mode.PRIVATE), bisect_by=cut_extrude33_end, keep=Keep.BOTH, mode=Mode.PRIVATE)
    add(cut_extrude33_tool2.solids().sort_by_distance((3.772955, 0, 3.5))[0], mode=Mode.SUBTRACT)

    # Sketch37 → Cut-Extrude34 (cut, two sides: drawn at the far end of the back side and taken through both)
    with BuildSketch(Plane.XZ.offset(-11.5).offset(-CUT_EXTRUDE34_DEPTH_BACK)):
        Polygon((23, 3), (20, 0), (23, 0), align=None)
    extrude(amount=CUT_EXTRUDE34_DEPTH + CUT_EXTRUDE34_DEPTH_BACK, mode=Mode.SUBTRACT)

    # Sketch38 → Boss-Extrude13 (add)
    with BuildSketch(Plane(origin=(0, 0, 0), x_dir=(-1, 0, 0), z_dir=(0, 0, -1))):
        Polygon((-2.962610506, 8.654508497), (-1.962610506, 8.654508497), (-1.962610506, 13.780782745), (-15.446112906, 12.315184658), (-15.446112906, 11.309294632), (-2.962610506, 12.666197067), align=None)
        Polygon((-2.962610506, 6.345491503), (-1.962610506, 6.345491503), (-1.962610506, 1.219217255), (-15.436151057, 2.683732532), (-15.436151057, 3.689622559), (-2.962610506, 2.333802933), align=None)
    extrude(amount=BOSS_EXTRUDE13_DEPTH)

    # Sketch39 → Cut-Extrude35 (cut)
    with BuildSketch(Plane(origin=(0, 0, 0), x_dir=(-1, 0, 0), z_dir=(0, 0, -1))):
        with BuildLine():
            Line((-14.642674888, 11.077060629), (-12.388868113, 11.077060629))
            ThreePointArc((-12.388868113, 11.077060629), (-11.888868113, 10.577060629), (-12.388868113, 10.077060629))
            Line((-12.388868113, 10.077060629), (-14.642674888, 10.077060629))
            ThreePointArc((-14.642674888, 10.077060629), (-15.142674888, 10.577060629), (-14.642674888, 11.077060629))
        make_face()
        with BuildLine():
            Line((-14.642674888, 4.993835409), (-12.388868113, 4.993835409))
            ThreePointArc((-12.388868113, 4.993835409), (-11.888868113, 4.493835409), (-12.388868113, 3.993835409))
            Line((-12.388868113, 3.993835409), (-14.642674888, 3.993835409))
            ThreePointArc((-14.642674888, 3.993835409), (-15.142674888, 4.493835409), (-14.642674888, 4.993835409))
        make_face()
        with BuildLine():
            Line((-6.641269667, 4.993835409), (-4.387462892, 4.993835409))
            ThreePointArc((-4.387462892, 4.993835409), (-3.887462892, 4.493835409), (-4.387462892, 3.993835409))
            Line((-4.387462892, 3.993835409), (-6.641269667, 3.993835409))
            ThreePointArc((-6.641269667, 3.993835409), (-7.141269667, 4.493835409), (-6.641269667, 4.993835409))
        make_face()
        with BuildLine():
            Line((-6.641269667, 11.077060629), (-4.387462892, 11.077060629))
            ThreePointArc((-4.387462892, 11.077060629), (-3.887462892, 10.577060629), (-4.387462892, 10.077060629))
            Line((-4.387462892, 10.077060629), (-6.641269667, 10.077060629))
            ThreePointArc((-6.641269667, 10.077060629), (-7.141269667, 10.577060629), (-6.641269667, 11.077060629))
        make_face()
    extrude(amount=-CUT_EXTRUDE35_DEPTH, mode=Mode.SUBTRACT)


solid = part.part
